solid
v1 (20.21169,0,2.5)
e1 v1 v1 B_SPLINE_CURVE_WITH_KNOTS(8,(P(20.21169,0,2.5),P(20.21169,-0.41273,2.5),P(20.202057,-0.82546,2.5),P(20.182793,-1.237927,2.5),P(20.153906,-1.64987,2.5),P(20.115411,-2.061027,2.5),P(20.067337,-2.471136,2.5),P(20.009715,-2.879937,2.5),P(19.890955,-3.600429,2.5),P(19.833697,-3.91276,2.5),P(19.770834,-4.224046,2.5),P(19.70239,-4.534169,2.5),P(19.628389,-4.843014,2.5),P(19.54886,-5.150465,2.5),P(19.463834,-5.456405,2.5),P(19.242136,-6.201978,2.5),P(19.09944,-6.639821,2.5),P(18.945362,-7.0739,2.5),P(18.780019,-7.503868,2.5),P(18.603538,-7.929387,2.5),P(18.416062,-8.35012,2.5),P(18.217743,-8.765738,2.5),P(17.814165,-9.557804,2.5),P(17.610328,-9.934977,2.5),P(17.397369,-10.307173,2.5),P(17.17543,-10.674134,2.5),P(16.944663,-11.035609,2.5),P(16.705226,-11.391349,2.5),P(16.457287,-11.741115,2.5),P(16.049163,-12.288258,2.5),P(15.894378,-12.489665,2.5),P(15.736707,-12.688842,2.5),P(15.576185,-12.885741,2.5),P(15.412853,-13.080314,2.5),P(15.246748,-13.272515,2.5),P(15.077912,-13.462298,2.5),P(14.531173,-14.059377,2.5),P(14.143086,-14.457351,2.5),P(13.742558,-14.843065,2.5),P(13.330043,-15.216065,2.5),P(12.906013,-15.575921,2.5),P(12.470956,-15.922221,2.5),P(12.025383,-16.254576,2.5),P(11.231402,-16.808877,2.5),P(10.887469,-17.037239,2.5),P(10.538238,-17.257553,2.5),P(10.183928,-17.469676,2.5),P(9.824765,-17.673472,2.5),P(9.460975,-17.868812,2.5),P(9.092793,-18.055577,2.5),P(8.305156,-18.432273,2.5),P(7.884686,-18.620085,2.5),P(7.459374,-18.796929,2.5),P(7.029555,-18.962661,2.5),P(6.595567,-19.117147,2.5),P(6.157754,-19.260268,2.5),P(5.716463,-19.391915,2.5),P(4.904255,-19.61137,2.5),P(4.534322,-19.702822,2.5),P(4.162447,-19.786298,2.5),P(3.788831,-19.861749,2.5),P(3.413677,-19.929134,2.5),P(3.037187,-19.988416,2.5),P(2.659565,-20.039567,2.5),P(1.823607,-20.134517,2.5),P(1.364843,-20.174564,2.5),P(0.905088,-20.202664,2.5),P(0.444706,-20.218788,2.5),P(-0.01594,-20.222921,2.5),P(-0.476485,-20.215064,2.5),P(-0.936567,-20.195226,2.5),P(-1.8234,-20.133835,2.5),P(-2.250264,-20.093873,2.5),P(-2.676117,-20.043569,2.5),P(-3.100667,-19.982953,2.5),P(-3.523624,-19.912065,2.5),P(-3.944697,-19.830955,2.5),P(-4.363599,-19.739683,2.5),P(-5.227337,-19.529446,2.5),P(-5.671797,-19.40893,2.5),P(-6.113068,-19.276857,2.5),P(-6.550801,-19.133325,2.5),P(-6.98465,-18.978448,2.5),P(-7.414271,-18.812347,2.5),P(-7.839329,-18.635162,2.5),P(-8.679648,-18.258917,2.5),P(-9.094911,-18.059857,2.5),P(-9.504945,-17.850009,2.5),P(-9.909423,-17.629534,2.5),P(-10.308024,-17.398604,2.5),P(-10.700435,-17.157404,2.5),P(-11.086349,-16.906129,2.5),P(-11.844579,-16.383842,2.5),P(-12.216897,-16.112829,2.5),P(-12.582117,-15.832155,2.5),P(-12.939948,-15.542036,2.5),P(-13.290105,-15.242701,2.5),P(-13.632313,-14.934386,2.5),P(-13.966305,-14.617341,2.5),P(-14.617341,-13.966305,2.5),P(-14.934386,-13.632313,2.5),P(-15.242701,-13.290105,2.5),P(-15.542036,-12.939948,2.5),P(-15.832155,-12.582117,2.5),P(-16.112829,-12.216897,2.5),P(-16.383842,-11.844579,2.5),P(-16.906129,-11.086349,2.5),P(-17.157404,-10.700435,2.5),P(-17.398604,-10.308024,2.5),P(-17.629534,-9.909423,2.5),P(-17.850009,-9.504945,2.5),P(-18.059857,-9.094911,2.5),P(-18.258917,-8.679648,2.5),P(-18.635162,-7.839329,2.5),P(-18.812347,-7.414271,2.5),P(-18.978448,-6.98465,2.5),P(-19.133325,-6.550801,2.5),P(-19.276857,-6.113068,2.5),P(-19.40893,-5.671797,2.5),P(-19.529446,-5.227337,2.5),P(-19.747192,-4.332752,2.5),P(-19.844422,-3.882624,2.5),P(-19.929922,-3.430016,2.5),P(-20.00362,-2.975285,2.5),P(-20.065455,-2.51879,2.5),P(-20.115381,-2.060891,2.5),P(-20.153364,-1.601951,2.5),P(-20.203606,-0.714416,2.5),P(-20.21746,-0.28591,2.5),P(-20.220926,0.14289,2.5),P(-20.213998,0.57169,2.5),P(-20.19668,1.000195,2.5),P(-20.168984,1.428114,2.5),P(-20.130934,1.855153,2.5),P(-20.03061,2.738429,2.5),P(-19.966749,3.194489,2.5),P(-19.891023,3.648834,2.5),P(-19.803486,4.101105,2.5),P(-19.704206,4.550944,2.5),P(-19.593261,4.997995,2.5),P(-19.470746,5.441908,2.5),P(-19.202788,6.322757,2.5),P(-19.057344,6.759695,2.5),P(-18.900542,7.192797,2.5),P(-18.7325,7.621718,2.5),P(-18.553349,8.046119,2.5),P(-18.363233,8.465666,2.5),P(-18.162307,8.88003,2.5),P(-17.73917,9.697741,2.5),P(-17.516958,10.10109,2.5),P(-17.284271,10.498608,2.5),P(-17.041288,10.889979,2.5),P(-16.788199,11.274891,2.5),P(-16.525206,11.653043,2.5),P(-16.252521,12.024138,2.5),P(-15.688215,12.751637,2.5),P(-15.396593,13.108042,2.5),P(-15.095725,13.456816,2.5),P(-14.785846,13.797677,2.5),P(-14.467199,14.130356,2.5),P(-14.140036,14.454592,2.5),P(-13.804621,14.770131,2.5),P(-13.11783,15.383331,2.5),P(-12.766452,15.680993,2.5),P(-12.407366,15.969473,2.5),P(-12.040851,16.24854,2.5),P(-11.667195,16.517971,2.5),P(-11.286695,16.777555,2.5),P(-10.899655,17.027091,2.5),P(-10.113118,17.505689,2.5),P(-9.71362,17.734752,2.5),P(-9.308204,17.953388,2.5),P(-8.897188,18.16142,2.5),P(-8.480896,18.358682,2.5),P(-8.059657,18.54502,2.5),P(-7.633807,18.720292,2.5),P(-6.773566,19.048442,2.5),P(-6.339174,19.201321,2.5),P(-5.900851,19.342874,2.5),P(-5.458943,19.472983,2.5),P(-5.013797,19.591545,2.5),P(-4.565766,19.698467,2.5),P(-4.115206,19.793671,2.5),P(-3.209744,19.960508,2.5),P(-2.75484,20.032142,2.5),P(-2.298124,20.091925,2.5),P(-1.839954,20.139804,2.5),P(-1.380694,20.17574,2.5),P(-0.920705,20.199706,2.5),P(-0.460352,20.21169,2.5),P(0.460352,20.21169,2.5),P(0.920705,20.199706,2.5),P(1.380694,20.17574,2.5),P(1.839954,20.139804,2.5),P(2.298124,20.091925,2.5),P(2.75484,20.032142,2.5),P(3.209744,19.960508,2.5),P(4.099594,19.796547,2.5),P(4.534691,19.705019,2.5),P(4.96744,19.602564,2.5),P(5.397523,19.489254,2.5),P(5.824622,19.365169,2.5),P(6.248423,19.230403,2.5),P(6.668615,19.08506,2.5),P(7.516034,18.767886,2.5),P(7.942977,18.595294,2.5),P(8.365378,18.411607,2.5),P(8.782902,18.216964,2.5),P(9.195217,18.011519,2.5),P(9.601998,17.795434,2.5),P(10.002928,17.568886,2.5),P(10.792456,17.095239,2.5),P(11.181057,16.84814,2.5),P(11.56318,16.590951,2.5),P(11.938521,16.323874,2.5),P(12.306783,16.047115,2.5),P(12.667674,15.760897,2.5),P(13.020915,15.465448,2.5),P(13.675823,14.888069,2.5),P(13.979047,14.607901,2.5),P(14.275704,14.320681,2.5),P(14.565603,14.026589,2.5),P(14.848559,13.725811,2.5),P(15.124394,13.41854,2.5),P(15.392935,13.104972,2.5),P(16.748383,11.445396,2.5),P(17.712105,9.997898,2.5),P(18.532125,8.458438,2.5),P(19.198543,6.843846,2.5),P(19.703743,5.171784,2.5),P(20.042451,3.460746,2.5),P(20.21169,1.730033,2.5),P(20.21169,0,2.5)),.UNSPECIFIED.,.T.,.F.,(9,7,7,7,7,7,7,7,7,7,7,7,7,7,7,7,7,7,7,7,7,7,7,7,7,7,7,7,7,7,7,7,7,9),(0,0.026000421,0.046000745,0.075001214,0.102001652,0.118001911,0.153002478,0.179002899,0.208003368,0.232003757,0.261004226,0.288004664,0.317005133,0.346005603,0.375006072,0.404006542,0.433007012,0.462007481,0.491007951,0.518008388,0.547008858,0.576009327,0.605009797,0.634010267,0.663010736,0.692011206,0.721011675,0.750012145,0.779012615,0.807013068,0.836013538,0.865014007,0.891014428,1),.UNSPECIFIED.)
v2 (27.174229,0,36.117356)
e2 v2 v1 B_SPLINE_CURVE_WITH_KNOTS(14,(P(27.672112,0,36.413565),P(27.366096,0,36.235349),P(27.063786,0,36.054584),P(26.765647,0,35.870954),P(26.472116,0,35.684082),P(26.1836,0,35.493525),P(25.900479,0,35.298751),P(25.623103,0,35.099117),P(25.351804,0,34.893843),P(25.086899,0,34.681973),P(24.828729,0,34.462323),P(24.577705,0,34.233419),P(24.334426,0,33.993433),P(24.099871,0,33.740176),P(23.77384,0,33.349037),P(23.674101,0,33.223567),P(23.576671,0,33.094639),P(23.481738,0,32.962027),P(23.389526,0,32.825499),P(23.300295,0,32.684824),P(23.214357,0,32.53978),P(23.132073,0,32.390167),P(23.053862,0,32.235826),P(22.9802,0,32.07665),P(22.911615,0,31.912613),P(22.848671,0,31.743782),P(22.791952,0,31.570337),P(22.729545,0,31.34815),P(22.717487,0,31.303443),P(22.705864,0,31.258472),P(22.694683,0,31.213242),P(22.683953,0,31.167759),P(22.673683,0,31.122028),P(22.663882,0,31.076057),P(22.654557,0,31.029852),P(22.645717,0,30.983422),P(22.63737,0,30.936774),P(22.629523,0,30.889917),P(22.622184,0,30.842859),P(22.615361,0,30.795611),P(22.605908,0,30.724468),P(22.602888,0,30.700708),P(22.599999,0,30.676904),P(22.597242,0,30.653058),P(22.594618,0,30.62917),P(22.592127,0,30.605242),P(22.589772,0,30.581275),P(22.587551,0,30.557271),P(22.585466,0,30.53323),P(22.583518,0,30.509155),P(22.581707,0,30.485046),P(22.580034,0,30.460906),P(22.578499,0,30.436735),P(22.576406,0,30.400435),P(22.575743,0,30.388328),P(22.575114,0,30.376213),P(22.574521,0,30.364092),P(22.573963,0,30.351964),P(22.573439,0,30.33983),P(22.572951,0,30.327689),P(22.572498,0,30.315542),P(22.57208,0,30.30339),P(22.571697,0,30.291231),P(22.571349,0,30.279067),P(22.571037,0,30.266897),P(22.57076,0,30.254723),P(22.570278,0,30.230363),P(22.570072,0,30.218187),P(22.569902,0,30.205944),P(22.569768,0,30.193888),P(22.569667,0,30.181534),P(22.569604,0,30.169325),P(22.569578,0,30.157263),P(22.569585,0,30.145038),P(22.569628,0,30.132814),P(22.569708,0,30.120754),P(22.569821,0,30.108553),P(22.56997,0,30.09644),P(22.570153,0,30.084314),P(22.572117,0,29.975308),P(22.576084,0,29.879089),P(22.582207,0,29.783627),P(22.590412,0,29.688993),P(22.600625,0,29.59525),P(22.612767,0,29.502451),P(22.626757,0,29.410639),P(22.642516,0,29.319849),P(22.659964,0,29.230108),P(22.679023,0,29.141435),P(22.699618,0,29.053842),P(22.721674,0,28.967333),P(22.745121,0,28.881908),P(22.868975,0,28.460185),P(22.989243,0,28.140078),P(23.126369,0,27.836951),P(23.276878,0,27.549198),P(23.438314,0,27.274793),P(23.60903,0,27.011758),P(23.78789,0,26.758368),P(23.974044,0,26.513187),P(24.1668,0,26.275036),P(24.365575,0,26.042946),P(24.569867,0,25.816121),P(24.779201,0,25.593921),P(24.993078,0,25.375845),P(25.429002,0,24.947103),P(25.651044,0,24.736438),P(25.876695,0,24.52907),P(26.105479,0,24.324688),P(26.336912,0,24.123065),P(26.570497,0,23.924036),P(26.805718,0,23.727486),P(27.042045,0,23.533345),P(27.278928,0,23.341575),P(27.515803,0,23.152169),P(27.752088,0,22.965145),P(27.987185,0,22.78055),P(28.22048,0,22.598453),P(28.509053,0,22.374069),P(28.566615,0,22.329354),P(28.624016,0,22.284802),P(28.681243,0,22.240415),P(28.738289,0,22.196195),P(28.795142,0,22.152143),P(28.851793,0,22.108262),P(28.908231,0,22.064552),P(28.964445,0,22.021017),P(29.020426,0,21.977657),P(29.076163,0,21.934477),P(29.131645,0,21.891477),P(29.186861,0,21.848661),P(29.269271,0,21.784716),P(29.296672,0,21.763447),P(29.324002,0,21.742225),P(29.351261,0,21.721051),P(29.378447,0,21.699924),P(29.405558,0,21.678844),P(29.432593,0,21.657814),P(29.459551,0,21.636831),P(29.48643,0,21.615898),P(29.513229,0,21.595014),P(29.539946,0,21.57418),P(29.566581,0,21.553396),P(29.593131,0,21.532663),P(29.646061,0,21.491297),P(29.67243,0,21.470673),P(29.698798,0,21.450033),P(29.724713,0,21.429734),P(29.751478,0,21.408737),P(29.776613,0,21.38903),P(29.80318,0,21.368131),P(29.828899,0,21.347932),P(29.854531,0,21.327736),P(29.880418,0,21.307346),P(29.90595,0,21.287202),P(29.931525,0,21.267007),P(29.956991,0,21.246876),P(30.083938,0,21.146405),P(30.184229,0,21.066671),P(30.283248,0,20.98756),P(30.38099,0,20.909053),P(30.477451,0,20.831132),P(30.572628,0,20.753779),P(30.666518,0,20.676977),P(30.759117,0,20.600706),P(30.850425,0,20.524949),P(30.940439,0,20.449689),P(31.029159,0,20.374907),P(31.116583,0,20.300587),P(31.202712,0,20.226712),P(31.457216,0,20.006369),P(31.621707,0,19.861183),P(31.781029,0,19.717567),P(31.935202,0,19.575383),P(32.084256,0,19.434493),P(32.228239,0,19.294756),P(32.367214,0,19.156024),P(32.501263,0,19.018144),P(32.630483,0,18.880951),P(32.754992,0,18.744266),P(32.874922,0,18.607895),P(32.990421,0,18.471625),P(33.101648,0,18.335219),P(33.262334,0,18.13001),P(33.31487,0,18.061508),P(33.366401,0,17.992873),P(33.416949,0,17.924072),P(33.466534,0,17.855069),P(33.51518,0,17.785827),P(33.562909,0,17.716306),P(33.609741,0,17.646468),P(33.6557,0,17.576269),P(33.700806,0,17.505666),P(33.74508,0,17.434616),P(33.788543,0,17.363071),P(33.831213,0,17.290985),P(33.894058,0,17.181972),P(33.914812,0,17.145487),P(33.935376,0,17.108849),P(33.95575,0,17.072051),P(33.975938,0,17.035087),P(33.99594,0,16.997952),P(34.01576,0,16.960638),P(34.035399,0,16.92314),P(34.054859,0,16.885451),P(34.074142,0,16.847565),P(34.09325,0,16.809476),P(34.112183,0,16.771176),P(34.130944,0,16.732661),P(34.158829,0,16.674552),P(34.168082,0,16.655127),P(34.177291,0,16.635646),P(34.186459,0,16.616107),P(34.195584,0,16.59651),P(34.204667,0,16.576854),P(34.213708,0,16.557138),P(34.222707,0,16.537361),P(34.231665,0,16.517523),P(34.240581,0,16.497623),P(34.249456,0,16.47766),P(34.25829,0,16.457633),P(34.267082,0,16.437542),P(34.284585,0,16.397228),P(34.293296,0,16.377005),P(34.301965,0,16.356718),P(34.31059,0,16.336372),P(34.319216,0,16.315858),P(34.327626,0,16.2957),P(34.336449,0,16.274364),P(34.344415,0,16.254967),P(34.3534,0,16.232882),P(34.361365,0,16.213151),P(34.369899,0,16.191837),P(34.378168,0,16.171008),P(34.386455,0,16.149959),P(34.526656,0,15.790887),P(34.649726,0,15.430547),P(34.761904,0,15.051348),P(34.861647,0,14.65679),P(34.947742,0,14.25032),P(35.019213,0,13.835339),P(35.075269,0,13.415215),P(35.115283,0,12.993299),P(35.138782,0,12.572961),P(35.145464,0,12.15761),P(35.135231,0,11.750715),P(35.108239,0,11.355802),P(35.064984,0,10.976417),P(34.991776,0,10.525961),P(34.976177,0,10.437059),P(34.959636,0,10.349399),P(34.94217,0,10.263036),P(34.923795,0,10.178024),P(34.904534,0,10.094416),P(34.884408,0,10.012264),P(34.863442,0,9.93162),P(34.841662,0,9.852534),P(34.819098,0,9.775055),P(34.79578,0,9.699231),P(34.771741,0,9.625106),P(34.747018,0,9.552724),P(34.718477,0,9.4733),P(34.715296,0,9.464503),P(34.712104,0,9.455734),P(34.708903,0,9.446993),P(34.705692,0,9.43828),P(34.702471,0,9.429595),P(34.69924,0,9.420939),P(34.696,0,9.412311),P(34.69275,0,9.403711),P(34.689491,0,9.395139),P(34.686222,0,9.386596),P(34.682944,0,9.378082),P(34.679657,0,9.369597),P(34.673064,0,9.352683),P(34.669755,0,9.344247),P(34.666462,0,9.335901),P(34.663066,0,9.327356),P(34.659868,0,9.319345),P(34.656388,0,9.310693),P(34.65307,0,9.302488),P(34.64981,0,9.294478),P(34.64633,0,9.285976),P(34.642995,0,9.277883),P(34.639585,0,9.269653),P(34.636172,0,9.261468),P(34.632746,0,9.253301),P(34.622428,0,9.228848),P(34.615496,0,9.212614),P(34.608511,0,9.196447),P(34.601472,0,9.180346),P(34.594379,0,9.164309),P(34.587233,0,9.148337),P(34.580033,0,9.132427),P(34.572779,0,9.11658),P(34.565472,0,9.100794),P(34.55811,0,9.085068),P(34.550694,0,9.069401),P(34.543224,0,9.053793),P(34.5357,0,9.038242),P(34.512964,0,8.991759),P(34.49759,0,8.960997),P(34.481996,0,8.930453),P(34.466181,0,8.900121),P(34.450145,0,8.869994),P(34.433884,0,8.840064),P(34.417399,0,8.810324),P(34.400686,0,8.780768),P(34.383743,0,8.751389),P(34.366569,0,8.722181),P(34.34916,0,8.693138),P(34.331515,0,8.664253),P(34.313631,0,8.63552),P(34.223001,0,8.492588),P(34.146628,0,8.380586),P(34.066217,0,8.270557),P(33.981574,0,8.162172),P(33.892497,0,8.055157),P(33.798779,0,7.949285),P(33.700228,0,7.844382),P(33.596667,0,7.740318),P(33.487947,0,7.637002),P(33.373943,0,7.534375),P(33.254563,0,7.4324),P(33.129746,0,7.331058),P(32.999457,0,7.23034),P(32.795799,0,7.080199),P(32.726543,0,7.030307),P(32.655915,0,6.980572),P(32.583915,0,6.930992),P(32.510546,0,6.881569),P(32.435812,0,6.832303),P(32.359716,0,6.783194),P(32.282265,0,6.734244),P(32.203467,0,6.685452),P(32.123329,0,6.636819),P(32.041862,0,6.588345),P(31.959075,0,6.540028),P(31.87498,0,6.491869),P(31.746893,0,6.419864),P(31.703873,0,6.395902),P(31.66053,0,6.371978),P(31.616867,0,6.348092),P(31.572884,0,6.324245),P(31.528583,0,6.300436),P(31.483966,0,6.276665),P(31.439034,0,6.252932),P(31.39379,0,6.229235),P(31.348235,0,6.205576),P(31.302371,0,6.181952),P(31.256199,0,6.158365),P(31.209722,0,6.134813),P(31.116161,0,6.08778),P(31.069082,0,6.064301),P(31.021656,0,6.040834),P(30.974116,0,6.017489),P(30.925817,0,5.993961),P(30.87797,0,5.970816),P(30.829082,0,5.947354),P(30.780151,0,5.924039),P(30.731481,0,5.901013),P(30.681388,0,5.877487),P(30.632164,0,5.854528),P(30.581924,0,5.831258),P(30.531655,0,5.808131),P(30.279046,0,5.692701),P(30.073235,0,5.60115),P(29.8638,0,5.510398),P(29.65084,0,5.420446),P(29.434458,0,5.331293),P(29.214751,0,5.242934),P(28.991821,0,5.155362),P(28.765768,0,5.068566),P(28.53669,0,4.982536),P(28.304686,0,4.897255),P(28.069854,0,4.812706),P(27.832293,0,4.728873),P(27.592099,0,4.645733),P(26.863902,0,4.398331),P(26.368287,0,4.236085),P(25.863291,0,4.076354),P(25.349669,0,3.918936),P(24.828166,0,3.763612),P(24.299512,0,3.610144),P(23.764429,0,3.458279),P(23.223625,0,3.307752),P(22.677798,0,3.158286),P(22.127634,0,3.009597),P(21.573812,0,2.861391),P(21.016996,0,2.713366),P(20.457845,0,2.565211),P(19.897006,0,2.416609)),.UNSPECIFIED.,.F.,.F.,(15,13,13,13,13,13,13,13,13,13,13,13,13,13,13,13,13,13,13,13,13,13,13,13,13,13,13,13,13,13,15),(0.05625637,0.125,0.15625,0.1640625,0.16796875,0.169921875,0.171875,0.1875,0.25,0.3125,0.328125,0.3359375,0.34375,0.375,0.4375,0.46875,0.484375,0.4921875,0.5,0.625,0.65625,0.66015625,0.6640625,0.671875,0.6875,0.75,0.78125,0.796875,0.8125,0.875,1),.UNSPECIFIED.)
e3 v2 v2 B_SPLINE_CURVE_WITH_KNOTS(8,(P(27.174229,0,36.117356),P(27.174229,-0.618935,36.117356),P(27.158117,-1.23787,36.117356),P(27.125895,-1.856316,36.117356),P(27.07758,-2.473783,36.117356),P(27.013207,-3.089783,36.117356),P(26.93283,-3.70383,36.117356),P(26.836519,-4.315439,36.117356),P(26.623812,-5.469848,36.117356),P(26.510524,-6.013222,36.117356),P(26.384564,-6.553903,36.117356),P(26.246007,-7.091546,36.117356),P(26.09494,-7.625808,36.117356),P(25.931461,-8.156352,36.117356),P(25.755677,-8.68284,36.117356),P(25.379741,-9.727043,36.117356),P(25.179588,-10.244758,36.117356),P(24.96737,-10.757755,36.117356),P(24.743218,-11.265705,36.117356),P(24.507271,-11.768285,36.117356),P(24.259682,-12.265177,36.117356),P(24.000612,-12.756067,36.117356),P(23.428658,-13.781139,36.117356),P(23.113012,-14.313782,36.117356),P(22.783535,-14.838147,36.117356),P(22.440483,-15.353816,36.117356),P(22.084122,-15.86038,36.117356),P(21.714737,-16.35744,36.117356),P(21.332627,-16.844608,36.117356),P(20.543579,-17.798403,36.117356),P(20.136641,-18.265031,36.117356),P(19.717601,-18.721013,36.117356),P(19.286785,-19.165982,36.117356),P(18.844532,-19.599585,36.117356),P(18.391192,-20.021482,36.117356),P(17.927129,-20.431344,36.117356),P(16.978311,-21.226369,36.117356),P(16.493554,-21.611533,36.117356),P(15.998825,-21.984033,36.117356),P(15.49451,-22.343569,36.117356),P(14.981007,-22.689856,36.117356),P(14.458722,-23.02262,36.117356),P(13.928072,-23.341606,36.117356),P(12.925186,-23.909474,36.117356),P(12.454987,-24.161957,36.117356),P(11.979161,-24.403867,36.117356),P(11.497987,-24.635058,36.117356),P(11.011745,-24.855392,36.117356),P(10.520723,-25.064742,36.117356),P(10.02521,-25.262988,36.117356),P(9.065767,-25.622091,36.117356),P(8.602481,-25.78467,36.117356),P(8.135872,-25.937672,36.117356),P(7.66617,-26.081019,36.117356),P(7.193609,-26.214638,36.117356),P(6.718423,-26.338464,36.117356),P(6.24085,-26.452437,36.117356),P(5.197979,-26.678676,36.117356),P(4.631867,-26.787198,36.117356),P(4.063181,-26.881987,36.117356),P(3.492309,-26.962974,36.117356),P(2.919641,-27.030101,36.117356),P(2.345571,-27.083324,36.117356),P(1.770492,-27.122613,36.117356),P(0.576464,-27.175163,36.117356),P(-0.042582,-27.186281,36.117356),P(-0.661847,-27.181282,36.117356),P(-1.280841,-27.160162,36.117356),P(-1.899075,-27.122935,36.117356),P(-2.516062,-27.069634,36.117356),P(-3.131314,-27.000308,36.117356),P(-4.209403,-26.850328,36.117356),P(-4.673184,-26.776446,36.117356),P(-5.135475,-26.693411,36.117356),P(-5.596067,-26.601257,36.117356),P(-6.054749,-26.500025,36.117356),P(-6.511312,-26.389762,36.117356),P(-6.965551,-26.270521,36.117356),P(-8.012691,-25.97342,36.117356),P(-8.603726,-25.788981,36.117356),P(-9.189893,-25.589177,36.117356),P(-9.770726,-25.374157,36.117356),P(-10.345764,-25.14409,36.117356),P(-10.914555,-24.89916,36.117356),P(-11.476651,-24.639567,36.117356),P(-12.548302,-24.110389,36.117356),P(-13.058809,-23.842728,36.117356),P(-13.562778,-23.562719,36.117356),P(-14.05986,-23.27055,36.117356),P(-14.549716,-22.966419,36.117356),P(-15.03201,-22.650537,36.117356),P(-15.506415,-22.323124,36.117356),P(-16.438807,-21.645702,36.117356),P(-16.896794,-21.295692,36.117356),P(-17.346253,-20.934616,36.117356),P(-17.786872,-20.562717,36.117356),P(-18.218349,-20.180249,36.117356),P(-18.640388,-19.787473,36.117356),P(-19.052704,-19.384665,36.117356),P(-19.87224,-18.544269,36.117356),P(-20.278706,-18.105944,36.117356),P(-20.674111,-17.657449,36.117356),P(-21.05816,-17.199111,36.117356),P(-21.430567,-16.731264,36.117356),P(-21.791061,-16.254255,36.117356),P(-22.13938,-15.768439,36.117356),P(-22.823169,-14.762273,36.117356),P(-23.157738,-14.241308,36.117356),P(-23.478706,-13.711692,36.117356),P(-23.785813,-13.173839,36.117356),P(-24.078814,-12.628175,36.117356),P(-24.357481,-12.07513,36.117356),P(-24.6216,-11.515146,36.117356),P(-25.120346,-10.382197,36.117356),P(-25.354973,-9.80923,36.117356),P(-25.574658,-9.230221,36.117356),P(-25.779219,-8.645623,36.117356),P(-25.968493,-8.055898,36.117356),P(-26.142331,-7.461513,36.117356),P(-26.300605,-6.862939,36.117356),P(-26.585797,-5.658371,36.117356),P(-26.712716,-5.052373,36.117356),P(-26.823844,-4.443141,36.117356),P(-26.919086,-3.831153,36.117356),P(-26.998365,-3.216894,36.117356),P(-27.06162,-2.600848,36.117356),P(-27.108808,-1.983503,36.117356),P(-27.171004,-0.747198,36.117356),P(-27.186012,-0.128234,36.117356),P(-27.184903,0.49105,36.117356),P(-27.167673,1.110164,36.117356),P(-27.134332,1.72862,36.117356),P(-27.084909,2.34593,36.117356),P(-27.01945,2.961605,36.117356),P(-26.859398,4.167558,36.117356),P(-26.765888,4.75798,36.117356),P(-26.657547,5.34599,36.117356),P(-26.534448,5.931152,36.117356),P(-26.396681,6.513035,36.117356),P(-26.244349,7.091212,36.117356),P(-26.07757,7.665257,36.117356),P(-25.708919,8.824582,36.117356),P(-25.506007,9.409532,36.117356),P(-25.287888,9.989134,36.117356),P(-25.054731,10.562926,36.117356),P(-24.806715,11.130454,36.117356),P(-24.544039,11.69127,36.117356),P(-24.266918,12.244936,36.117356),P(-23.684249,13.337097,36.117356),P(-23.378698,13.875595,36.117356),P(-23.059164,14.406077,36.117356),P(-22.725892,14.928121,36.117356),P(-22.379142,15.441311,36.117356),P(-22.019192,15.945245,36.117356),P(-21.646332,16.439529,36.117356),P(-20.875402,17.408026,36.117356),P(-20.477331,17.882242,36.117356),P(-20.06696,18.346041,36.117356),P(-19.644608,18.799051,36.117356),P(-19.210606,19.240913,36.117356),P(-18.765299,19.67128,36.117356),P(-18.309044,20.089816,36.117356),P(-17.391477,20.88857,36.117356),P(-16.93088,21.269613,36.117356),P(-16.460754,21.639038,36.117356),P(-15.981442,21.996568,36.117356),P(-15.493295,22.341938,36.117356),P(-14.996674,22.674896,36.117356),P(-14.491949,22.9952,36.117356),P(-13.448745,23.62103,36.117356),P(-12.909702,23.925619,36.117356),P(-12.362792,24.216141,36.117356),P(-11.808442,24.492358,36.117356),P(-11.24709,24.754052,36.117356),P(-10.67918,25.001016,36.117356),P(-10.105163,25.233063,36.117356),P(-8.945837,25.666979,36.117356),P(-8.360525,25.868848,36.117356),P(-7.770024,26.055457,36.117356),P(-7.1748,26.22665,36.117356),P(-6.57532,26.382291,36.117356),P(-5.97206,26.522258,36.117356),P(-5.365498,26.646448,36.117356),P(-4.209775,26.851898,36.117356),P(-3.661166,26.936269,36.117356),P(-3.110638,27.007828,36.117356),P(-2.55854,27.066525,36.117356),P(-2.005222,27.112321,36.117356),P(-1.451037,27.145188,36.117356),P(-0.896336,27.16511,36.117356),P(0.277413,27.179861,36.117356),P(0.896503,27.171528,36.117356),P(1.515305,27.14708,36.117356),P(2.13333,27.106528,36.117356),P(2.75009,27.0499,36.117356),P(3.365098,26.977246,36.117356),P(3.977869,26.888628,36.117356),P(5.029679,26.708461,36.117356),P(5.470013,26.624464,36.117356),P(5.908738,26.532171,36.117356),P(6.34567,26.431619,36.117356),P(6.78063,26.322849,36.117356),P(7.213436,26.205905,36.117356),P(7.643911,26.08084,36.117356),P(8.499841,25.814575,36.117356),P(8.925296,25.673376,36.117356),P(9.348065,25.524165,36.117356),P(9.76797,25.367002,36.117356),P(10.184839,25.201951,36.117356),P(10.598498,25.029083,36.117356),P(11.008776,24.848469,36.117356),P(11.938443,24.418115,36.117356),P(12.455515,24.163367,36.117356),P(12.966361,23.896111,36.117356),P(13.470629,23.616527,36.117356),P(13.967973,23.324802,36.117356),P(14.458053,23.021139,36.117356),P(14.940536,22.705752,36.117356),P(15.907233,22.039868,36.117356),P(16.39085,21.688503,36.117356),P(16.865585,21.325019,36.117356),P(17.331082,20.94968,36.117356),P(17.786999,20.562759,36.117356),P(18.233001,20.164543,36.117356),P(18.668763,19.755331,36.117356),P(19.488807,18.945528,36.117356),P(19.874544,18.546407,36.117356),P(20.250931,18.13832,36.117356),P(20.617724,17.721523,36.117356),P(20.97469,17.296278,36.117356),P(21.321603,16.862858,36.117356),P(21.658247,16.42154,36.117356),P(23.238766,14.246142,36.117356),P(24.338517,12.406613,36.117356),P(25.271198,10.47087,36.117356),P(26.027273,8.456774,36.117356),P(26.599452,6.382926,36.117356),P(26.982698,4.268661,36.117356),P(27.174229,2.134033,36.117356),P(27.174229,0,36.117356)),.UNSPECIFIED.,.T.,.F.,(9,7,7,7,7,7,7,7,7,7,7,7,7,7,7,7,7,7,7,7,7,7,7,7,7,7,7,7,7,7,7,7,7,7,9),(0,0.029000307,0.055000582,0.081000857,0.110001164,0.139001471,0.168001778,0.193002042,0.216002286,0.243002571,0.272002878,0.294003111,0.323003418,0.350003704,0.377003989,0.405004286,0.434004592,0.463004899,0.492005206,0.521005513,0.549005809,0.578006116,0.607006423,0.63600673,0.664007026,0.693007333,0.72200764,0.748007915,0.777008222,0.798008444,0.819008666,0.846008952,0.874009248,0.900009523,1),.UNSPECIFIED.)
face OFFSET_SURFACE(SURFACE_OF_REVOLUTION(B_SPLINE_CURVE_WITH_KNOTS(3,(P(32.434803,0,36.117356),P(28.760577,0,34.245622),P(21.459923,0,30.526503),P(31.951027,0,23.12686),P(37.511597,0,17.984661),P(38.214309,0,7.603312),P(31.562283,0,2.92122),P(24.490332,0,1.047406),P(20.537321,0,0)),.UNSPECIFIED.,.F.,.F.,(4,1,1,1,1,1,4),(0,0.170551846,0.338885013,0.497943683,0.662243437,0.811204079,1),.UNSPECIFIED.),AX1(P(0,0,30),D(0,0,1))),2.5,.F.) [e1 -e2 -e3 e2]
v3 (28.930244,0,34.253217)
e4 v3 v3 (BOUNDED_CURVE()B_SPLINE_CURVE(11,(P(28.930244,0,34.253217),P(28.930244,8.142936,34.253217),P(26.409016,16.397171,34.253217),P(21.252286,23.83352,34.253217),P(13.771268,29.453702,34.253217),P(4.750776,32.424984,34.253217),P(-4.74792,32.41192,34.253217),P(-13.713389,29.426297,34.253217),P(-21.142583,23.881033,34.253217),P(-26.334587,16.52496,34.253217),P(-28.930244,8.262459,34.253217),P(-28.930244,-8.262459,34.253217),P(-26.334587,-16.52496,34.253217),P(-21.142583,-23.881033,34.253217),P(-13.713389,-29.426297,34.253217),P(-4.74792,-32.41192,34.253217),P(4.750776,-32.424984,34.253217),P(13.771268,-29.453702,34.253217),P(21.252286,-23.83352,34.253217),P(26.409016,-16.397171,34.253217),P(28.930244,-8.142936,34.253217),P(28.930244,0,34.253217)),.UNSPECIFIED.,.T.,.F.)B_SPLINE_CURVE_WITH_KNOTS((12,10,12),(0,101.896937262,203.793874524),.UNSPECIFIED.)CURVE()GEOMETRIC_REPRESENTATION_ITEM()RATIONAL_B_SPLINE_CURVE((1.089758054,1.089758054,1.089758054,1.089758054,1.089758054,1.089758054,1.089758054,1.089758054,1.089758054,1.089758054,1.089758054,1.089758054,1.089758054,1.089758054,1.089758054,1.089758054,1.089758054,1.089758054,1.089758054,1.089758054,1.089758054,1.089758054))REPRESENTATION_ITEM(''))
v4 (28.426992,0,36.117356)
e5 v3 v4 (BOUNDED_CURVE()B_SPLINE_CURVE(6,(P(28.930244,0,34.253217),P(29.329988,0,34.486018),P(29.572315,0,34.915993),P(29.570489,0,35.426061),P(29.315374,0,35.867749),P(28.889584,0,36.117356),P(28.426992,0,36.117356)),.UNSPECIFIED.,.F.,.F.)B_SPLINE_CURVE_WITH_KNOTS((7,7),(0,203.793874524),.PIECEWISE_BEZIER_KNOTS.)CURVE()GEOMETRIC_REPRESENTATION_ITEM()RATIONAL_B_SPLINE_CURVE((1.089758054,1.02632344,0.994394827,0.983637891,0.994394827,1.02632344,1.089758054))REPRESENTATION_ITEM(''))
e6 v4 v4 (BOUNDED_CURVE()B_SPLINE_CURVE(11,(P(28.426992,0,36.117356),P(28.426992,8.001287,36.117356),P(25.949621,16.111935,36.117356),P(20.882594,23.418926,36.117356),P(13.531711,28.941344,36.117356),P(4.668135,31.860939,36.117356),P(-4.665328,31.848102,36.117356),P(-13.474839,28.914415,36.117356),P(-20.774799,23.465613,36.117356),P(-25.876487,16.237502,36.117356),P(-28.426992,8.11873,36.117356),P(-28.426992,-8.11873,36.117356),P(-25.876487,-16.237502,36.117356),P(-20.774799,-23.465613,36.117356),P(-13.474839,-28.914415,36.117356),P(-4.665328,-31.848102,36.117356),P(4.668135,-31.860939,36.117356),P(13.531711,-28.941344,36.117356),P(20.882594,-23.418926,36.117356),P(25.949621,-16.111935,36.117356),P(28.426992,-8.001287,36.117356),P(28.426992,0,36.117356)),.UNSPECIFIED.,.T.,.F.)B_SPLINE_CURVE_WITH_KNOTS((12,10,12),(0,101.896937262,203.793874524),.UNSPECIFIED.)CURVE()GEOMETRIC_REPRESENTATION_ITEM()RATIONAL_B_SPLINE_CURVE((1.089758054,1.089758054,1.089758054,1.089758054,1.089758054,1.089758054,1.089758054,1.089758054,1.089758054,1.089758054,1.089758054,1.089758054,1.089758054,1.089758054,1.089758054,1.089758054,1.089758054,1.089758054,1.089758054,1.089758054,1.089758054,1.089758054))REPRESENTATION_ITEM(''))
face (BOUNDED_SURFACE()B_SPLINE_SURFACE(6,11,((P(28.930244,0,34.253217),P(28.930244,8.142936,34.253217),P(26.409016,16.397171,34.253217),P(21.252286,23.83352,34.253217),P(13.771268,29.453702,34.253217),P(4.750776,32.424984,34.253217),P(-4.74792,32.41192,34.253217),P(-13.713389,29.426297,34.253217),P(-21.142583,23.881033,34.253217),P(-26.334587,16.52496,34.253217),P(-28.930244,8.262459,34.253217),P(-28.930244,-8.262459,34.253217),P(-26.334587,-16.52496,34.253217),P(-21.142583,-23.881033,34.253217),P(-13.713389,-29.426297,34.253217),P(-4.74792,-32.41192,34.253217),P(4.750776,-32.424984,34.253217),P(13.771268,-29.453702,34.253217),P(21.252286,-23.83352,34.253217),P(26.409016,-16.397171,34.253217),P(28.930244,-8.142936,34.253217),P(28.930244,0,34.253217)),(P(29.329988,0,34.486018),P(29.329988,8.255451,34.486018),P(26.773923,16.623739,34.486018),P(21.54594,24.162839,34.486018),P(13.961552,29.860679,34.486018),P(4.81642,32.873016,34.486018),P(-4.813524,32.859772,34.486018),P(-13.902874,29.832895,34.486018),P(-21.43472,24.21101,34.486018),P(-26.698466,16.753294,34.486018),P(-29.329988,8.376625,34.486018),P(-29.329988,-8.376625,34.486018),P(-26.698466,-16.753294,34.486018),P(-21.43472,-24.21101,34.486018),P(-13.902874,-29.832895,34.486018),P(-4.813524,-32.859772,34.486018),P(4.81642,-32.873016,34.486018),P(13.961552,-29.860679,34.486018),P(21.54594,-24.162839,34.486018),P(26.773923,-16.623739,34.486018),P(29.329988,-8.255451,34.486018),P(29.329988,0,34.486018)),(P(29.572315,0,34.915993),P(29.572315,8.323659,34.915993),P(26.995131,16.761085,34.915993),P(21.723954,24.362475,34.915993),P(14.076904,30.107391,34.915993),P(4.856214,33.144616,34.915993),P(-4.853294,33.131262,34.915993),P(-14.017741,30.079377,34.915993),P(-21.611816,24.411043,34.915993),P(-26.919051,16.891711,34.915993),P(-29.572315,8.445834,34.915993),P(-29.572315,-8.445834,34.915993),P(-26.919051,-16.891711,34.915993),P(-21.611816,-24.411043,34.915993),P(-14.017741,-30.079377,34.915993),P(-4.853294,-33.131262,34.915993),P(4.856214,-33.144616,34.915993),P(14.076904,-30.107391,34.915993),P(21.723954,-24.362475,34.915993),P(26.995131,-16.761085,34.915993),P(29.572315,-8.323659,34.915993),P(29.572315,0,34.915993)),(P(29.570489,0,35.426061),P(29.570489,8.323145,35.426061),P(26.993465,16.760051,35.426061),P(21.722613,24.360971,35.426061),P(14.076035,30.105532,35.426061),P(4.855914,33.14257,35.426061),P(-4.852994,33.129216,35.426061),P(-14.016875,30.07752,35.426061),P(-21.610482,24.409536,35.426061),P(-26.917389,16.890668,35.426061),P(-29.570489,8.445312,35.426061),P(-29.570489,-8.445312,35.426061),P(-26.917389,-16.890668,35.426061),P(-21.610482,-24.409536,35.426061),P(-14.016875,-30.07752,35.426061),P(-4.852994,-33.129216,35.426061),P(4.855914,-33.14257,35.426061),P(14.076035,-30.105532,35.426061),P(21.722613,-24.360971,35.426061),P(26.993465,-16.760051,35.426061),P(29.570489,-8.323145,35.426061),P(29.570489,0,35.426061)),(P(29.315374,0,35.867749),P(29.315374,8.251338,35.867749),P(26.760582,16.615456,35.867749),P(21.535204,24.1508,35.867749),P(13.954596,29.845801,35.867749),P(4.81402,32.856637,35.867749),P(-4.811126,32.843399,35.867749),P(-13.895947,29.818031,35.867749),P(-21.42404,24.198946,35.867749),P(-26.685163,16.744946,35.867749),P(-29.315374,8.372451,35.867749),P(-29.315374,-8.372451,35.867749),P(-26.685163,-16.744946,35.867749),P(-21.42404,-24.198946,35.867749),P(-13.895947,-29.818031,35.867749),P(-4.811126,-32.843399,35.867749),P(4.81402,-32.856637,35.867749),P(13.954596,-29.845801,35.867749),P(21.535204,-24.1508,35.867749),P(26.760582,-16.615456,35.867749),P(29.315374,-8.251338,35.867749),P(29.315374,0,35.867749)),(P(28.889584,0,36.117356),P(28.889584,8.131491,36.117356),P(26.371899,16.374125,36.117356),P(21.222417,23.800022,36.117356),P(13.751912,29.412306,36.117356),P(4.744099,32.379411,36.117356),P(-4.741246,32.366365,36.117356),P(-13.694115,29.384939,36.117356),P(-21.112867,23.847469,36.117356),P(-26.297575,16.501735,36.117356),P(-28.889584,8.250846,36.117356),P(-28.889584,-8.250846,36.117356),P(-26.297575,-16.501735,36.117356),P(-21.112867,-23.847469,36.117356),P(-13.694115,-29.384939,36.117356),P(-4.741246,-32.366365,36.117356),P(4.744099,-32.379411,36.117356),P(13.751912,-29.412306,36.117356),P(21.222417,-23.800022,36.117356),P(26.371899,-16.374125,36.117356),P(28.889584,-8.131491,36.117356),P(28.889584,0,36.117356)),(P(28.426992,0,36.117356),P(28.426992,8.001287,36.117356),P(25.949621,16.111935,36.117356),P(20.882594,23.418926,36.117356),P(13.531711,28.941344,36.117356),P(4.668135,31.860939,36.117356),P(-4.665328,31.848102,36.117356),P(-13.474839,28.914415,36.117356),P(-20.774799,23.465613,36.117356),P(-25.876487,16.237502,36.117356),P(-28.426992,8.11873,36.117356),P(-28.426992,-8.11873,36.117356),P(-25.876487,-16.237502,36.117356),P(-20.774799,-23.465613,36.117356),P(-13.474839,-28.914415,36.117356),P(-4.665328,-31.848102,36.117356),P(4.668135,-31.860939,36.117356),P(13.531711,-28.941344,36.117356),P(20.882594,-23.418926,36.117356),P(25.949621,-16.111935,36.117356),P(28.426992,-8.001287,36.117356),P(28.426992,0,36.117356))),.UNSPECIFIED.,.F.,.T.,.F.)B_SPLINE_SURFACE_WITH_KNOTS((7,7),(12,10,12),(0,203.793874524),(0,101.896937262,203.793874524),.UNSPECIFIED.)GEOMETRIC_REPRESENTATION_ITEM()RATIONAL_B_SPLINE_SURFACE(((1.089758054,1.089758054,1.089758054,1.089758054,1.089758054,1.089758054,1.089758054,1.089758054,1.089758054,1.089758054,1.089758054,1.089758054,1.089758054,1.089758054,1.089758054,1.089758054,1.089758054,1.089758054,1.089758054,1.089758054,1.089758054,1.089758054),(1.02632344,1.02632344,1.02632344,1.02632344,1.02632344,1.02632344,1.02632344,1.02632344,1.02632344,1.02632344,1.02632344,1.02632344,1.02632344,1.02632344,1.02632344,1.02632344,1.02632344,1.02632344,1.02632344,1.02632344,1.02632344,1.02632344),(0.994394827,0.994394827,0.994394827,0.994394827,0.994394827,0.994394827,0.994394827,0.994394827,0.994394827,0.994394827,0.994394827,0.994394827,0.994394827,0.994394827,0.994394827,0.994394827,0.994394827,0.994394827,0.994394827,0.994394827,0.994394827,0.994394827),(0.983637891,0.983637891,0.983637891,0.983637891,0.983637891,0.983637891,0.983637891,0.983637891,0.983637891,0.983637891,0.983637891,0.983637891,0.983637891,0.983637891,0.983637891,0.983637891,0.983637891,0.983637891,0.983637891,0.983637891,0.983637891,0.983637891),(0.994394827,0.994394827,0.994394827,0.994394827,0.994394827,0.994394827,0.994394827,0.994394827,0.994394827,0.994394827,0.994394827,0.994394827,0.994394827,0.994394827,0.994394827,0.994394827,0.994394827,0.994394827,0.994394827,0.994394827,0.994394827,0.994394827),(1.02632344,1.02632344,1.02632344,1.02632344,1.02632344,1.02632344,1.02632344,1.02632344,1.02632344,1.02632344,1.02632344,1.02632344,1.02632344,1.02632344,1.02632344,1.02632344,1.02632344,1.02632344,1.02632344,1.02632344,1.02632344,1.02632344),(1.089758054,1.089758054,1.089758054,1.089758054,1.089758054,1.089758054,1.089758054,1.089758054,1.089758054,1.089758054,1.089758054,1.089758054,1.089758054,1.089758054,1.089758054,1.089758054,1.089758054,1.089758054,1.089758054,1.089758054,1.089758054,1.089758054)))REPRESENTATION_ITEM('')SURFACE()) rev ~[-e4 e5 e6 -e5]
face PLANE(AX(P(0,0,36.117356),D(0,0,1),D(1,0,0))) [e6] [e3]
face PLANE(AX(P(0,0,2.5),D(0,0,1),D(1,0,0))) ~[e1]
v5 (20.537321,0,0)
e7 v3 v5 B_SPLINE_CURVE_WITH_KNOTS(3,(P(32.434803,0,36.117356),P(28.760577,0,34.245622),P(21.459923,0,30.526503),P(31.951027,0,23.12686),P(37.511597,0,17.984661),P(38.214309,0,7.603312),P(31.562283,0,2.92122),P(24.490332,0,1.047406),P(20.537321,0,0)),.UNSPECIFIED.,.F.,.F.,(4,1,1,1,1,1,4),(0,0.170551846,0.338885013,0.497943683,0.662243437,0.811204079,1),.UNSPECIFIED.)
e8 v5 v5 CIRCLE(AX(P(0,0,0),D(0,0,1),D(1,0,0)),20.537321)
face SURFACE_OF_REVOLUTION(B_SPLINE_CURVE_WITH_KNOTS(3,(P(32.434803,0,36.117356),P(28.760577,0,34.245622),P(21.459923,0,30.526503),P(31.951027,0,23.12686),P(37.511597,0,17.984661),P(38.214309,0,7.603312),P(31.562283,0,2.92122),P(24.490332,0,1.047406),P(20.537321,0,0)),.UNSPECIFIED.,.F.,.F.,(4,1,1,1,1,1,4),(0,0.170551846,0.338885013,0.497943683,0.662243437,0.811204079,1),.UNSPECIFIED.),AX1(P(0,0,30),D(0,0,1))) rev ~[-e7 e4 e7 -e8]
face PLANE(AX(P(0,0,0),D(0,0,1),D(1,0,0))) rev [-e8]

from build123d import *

# Parameters (mm, degrees)
F2_R = 1
F3_T = 2.5


# Not quite as in the source:
# - a shell that OpenCascade refuses in one call is made with other operations: the cavity is built on its own and cut out


with BuildPart() as f1:
    # F0 (on Front) → F1 (revolve)
    with BuildSketch(Plane.XZ):
        with BuildLine():
            Line((0, 36.1173562706), (0, 0))
            Line((0, 0), (20.5373205245, 0))
            add(Edge.make_bspline(
                [(32.4348025024, 36.1173562706), (28.7605769049, 34.2456221664), (21.4599230609, 30.526503016), (31.9510267097, 23.1268602371), (37.51159658, 17.9846609491), (38.2143091958, 7.603312448), (31.5622825504, 2.9212203426), (24.4903317096, 1.0474064819), (20.5373205245, 0)],
                knots=[0, 0, 0, 0, 0.1705518459, 0.338885013, 0.4979436834, 0.6622434373, 0.8112040793, 1, 1, 1, 1], degree=3))
            Line((32.4348025024, 36.1173562706), (0, 36.1173562706))
        make_face()
    revolve(axis=Axis((0, 0, 30), (0, 0, 1)))

    # F2
    f2_edges = [f1.edges().sort_by_distance(p)[0] for p in [
        (-32.434803, 0, 36.117356),
    ]]
    fillet(f2_edges, radius=F2_R)

    # F3: shell of thickness 2.5, made by hand


with BuildPart() as f3_core1:
    # F3_t2: copy of F1
    add(f1.part)

    # the walls: a layer under each face that stays
    f3_faces = [f3_core1.faces().sort_by_distance(p)[0] for p in [
        (-37.1847044397, 0, 15.5931573763),
        (-29.3924291561, 0, 35.3779908749),
        (0, 0, 0),
    ]]
    thicken(f3_faces, amount=-F3_T, mode=Mode.SUBTRACT)


with BuildPart() as f1_1:
    add(f1.part)

    # what is left inside the walls is the cavity
    f3_cavity = [f3_core1.part.solids().sort_by_distance(p)[0] for p in [
        (-31.253873, 0, 20.149337),
    ]]
    add(f3_cavity, mode=Mode.SUBTRACT)


solid = f1_1.part
